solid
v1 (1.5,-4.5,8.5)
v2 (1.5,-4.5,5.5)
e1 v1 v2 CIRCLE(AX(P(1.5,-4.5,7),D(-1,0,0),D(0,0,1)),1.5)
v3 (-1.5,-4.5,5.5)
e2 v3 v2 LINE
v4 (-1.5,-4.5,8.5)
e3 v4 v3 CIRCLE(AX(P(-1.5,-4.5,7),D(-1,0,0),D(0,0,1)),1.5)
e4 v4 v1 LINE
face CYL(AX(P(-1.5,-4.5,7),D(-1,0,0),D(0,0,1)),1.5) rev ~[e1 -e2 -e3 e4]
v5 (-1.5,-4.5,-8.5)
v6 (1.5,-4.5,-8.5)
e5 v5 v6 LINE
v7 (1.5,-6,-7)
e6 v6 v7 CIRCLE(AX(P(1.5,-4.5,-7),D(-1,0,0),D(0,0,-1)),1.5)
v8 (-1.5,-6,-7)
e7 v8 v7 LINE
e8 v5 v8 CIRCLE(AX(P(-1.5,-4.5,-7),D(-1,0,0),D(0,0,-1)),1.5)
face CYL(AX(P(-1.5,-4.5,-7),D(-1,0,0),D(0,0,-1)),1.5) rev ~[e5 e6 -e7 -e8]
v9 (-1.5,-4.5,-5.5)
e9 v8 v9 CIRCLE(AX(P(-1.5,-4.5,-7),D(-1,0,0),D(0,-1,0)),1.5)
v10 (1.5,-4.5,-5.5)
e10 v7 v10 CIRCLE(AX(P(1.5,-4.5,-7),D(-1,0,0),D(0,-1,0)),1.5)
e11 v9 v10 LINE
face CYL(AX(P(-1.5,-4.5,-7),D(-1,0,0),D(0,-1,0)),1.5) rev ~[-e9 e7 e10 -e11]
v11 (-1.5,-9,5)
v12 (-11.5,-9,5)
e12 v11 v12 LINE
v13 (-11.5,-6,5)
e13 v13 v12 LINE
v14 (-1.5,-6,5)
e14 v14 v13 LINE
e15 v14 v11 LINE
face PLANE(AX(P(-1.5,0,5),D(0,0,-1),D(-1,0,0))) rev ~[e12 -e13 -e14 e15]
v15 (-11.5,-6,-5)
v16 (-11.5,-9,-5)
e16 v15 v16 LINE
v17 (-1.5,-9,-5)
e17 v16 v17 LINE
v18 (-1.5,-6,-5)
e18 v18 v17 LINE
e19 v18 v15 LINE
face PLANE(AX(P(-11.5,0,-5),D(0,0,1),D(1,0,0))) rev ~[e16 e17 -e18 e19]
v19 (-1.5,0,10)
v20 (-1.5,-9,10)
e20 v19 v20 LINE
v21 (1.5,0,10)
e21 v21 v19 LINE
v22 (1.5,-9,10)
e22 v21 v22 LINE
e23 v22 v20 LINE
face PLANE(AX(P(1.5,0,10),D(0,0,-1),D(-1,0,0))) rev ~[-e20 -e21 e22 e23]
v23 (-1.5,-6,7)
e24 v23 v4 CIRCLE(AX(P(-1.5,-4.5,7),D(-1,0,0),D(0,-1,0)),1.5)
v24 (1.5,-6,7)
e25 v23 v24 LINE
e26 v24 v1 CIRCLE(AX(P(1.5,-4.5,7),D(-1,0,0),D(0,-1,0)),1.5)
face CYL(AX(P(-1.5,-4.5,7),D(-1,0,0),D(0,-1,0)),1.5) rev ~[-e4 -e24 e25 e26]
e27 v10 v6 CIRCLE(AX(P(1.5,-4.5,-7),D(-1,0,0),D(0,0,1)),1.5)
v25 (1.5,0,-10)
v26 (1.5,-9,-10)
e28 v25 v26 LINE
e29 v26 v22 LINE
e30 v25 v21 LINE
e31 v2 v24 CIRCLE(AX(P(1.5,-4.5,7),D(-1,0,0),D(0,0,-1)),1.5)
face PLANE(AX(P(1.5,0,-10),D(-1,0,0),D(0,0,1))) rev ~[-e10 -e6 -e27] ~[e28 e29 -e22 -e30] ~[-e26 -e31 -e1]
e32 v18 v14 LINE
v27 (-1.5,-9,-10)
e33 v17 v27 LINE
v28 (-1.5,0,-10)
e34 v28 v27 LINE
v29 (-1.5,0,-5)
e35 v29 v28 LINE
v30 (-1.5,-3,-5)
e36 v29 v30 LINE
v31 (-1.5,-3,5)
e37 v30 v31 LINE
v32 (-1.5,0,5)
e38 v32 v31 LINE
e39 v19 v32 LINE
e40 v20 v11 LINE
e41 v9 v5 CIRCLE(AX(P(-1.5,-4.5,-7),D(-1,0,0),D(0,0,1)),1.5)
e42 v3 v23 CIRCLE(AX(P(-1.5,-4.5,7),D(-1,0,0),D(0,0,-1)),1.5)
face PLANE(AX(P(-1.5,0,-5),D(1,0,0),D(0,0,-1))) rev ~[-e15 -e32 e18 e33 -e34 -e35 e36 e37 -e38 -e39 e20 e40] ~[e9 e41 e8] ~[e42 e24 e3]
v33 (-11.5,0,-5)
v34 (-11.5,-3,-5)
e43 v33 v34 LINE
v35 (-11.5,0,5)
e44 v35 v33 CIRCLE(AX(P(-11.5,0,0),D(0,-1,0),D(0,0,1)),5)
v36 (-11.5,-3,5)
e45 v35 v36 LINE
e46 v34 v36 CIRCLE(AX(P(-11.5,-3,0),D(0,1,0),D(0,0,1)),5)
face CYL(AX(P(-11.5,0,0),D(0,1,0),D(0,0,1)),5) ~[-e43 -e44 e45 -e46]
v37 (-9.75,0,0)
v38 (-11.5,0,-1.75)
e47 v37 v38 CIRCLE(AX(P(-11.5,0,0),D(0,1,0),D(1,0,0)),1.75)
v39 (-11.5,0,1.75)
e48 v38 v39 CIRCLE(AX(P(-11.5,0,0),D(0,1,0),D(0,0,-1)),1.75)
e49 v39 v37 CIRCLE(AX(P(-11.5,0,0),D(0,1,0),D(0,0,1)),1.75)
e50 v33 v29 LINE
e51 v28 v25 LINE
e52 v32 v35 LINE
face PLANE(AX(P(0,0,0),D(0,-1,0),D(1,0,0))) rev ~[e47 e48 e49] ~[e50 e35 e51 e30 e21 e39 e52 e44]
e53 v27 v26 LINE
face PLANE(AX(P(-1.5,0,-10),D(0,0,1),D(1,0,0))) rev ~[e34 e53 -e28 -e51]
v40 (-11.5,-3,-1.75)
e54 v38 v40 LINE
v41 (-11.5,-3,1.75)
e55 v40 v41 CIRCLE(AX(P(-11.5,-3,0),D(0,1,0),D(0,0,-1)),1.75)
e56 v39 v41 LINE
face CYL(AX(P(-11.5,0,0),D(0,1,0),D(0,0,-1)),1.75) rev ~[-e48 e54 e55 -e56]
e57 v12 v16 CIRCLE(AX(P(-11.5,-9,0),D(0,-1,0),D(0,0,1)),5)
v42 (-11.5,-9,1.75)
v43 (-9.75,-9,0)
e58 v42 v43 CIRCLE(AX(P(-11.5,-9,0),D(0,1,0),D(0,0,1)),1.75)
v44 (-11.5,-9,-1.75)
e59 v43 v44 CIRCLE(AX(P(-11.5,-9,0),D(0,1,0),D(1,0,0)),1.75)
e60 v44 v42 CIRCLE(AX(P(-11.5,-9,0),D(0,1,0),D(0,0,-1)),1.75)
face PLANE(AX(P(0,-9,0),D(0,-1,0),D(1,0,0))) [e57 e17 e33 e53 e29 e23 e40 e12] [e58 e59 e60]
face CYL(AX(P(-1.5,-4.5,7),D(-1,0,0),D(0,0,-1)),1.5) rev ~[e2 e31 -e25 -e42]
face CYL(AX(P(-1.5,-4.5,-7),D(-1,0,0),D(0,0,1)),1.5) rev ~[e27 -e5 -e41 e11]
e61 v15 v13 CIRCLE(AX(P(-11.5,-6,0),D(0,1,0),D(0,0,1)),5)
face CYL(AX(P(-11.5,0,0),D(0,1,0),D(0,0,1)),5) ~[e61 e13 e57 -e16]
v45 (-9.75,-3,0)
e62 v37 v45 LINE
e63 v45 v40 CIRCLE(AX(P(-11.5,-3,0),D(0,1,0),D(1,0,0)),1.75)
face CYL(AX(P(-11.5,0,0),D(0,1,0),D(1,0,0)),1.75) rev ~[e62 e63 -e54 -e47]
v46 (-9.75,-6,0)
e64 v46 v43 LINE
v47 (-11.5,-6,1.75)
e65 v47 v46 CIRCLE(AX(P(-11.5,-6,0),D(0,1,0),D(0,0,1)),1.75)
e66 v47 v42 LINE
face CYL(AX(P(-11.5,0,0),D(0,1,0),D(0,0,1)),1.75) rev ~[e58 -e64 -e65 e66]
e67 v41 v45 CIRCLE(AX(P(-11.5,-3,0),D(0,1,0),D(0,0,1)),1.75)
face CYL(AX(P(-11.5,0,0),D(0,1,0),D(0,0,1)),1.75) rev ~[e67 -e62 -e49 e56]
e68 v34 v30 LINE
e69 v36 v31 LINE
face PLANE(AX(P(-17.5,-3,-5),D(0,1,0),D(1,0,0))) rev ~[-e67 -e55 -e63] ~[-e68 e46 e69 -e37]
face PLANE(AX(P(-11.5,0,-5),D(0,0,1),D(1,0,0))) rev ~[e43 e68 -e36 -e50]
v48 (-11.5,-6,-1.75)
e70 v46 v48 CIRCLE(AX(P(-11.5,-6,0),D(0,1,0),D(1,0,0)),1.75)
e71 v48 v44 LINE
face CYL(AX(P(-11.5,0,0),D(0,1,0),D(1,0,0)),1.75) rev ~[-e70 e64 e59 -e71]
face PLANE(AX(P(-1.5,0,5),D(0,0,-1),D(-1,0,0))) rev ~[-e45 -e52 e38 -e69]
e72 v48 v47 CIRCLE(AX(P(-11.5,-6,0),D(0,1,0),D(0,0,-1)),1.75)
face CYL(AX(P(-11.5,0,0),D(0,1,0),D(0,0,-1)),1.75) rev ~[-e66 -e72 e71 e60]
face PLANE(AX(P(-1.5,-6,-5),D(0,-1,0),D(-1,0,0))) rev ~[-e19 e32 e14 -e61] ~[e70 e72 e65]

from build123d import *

# Parameters (mm, degrees)
F1_DEPTH = 9
F2_W     = 10
F2_H     = 3
F2_W_2   = 6
F3_DEPTH = 11.5
F5_DEPTH = 3


with BuildPart() as f1:
    # F0 (on Front) → F1 (new body)
    with BuildSketch(Plane.XZ):
        Polygon((-1.5, -10), (1.5, -10), (1.5, 10), (-1.5, 10), (-1.5, 5), (-1.5, 0), (-1.5, -5), align=None)
        with BuildLine():
            ThreePointArc((-11.5, 5), (-16.5, 0), (-11.5, -5))
            Line((-11.5, -5), (-11.5, -1.75))
            ThreePointArc((-11.5, -1.75), (-13.25, 0), (-11.5, 1.75))
            Line((-11.5, 1.75), (-11.5, 5))
        make_face()
        with BuildLine():
            Line((-11.5, -5), (-1.5, -5))
            Line((-1.5, -5), (-1.5, 0))
            Line((-1.5, 0), (-1.5, 5))
            Line((-1.5, 5), (-11.5, 5))
            Line((-11.5, 5), (-11.5, 1.75))
            ThreePointArc((-11.5, 1.75), (-10.2625631329, 1.2374368671), (-9.75, 0))
            ThreePointArc((-9.75, 0), (-10.2625631329, -1.2374368671), (-11.5, -1.75))
            Line((-11.5, -1.75), (-11.5, -5))
        make_face()
    extrude(amount=F1_DEPTH)

    # F2 (on face) → F3 (cut)
    with BuildSketch(Plane(origin=(0, 0, -5), x_dir=(1, 0, 0), z_dir=(0, 0, -1))):
        with Locations((-6.5, 4.5)):
            Rectangle(F2_W, F2_H)
        with Locations((-14.5, 4.5)):
            Rectangle(F2_W_2, F2_H)
    extrude(amount=-F3_DEPTH, mode=Mode.SUBTRACT)

    # F4 (on face) → F5 (cut)
    with BuildSketch(Plane(origin=(-1.5, 0, 0), x_dir=(0, -1, 0), z_dir=(-1, 0, 0))):
        with BuildLine():
            ThreePointArc((4.5, -5.5), (3, -7), (4.5, -8.5))
            Line((4.5, -8.5), (4.5, -5.5))
        make_face()
        with BuildLine():
            Line((4.5, -5.5), (4.5, -8.5))
            ThreePointArc((4.5, -8.5), (5.5606601718, -8.0606601718), (6, -7))
            ThreePointArc((6, -7), (5.5606601718, -5.9393398282), (4.5, -5.5))
        make_face()
        with BuildLine():
            ThreePointArc((4.5, 8.5), (3, 7), (4.5, 5.5))
            Line((4.5, 5.5), (4.5, 8.5))
        make_face()
        with BuildLine():
            Line((4.5, 8.5), (4.5, 5.5))
            ThreePointArc((4.5, 5.5), (5.5606601718, 5.9393398282), (6, 7))
            ThreePointArc((6, 7), (5.5606601718, 8.0606601718), (4.5, 8.5))
        make_face()
    extrude(amount=-F5_DEPTH, mode=Mode.SUBTRACT)


solid = f1.part
